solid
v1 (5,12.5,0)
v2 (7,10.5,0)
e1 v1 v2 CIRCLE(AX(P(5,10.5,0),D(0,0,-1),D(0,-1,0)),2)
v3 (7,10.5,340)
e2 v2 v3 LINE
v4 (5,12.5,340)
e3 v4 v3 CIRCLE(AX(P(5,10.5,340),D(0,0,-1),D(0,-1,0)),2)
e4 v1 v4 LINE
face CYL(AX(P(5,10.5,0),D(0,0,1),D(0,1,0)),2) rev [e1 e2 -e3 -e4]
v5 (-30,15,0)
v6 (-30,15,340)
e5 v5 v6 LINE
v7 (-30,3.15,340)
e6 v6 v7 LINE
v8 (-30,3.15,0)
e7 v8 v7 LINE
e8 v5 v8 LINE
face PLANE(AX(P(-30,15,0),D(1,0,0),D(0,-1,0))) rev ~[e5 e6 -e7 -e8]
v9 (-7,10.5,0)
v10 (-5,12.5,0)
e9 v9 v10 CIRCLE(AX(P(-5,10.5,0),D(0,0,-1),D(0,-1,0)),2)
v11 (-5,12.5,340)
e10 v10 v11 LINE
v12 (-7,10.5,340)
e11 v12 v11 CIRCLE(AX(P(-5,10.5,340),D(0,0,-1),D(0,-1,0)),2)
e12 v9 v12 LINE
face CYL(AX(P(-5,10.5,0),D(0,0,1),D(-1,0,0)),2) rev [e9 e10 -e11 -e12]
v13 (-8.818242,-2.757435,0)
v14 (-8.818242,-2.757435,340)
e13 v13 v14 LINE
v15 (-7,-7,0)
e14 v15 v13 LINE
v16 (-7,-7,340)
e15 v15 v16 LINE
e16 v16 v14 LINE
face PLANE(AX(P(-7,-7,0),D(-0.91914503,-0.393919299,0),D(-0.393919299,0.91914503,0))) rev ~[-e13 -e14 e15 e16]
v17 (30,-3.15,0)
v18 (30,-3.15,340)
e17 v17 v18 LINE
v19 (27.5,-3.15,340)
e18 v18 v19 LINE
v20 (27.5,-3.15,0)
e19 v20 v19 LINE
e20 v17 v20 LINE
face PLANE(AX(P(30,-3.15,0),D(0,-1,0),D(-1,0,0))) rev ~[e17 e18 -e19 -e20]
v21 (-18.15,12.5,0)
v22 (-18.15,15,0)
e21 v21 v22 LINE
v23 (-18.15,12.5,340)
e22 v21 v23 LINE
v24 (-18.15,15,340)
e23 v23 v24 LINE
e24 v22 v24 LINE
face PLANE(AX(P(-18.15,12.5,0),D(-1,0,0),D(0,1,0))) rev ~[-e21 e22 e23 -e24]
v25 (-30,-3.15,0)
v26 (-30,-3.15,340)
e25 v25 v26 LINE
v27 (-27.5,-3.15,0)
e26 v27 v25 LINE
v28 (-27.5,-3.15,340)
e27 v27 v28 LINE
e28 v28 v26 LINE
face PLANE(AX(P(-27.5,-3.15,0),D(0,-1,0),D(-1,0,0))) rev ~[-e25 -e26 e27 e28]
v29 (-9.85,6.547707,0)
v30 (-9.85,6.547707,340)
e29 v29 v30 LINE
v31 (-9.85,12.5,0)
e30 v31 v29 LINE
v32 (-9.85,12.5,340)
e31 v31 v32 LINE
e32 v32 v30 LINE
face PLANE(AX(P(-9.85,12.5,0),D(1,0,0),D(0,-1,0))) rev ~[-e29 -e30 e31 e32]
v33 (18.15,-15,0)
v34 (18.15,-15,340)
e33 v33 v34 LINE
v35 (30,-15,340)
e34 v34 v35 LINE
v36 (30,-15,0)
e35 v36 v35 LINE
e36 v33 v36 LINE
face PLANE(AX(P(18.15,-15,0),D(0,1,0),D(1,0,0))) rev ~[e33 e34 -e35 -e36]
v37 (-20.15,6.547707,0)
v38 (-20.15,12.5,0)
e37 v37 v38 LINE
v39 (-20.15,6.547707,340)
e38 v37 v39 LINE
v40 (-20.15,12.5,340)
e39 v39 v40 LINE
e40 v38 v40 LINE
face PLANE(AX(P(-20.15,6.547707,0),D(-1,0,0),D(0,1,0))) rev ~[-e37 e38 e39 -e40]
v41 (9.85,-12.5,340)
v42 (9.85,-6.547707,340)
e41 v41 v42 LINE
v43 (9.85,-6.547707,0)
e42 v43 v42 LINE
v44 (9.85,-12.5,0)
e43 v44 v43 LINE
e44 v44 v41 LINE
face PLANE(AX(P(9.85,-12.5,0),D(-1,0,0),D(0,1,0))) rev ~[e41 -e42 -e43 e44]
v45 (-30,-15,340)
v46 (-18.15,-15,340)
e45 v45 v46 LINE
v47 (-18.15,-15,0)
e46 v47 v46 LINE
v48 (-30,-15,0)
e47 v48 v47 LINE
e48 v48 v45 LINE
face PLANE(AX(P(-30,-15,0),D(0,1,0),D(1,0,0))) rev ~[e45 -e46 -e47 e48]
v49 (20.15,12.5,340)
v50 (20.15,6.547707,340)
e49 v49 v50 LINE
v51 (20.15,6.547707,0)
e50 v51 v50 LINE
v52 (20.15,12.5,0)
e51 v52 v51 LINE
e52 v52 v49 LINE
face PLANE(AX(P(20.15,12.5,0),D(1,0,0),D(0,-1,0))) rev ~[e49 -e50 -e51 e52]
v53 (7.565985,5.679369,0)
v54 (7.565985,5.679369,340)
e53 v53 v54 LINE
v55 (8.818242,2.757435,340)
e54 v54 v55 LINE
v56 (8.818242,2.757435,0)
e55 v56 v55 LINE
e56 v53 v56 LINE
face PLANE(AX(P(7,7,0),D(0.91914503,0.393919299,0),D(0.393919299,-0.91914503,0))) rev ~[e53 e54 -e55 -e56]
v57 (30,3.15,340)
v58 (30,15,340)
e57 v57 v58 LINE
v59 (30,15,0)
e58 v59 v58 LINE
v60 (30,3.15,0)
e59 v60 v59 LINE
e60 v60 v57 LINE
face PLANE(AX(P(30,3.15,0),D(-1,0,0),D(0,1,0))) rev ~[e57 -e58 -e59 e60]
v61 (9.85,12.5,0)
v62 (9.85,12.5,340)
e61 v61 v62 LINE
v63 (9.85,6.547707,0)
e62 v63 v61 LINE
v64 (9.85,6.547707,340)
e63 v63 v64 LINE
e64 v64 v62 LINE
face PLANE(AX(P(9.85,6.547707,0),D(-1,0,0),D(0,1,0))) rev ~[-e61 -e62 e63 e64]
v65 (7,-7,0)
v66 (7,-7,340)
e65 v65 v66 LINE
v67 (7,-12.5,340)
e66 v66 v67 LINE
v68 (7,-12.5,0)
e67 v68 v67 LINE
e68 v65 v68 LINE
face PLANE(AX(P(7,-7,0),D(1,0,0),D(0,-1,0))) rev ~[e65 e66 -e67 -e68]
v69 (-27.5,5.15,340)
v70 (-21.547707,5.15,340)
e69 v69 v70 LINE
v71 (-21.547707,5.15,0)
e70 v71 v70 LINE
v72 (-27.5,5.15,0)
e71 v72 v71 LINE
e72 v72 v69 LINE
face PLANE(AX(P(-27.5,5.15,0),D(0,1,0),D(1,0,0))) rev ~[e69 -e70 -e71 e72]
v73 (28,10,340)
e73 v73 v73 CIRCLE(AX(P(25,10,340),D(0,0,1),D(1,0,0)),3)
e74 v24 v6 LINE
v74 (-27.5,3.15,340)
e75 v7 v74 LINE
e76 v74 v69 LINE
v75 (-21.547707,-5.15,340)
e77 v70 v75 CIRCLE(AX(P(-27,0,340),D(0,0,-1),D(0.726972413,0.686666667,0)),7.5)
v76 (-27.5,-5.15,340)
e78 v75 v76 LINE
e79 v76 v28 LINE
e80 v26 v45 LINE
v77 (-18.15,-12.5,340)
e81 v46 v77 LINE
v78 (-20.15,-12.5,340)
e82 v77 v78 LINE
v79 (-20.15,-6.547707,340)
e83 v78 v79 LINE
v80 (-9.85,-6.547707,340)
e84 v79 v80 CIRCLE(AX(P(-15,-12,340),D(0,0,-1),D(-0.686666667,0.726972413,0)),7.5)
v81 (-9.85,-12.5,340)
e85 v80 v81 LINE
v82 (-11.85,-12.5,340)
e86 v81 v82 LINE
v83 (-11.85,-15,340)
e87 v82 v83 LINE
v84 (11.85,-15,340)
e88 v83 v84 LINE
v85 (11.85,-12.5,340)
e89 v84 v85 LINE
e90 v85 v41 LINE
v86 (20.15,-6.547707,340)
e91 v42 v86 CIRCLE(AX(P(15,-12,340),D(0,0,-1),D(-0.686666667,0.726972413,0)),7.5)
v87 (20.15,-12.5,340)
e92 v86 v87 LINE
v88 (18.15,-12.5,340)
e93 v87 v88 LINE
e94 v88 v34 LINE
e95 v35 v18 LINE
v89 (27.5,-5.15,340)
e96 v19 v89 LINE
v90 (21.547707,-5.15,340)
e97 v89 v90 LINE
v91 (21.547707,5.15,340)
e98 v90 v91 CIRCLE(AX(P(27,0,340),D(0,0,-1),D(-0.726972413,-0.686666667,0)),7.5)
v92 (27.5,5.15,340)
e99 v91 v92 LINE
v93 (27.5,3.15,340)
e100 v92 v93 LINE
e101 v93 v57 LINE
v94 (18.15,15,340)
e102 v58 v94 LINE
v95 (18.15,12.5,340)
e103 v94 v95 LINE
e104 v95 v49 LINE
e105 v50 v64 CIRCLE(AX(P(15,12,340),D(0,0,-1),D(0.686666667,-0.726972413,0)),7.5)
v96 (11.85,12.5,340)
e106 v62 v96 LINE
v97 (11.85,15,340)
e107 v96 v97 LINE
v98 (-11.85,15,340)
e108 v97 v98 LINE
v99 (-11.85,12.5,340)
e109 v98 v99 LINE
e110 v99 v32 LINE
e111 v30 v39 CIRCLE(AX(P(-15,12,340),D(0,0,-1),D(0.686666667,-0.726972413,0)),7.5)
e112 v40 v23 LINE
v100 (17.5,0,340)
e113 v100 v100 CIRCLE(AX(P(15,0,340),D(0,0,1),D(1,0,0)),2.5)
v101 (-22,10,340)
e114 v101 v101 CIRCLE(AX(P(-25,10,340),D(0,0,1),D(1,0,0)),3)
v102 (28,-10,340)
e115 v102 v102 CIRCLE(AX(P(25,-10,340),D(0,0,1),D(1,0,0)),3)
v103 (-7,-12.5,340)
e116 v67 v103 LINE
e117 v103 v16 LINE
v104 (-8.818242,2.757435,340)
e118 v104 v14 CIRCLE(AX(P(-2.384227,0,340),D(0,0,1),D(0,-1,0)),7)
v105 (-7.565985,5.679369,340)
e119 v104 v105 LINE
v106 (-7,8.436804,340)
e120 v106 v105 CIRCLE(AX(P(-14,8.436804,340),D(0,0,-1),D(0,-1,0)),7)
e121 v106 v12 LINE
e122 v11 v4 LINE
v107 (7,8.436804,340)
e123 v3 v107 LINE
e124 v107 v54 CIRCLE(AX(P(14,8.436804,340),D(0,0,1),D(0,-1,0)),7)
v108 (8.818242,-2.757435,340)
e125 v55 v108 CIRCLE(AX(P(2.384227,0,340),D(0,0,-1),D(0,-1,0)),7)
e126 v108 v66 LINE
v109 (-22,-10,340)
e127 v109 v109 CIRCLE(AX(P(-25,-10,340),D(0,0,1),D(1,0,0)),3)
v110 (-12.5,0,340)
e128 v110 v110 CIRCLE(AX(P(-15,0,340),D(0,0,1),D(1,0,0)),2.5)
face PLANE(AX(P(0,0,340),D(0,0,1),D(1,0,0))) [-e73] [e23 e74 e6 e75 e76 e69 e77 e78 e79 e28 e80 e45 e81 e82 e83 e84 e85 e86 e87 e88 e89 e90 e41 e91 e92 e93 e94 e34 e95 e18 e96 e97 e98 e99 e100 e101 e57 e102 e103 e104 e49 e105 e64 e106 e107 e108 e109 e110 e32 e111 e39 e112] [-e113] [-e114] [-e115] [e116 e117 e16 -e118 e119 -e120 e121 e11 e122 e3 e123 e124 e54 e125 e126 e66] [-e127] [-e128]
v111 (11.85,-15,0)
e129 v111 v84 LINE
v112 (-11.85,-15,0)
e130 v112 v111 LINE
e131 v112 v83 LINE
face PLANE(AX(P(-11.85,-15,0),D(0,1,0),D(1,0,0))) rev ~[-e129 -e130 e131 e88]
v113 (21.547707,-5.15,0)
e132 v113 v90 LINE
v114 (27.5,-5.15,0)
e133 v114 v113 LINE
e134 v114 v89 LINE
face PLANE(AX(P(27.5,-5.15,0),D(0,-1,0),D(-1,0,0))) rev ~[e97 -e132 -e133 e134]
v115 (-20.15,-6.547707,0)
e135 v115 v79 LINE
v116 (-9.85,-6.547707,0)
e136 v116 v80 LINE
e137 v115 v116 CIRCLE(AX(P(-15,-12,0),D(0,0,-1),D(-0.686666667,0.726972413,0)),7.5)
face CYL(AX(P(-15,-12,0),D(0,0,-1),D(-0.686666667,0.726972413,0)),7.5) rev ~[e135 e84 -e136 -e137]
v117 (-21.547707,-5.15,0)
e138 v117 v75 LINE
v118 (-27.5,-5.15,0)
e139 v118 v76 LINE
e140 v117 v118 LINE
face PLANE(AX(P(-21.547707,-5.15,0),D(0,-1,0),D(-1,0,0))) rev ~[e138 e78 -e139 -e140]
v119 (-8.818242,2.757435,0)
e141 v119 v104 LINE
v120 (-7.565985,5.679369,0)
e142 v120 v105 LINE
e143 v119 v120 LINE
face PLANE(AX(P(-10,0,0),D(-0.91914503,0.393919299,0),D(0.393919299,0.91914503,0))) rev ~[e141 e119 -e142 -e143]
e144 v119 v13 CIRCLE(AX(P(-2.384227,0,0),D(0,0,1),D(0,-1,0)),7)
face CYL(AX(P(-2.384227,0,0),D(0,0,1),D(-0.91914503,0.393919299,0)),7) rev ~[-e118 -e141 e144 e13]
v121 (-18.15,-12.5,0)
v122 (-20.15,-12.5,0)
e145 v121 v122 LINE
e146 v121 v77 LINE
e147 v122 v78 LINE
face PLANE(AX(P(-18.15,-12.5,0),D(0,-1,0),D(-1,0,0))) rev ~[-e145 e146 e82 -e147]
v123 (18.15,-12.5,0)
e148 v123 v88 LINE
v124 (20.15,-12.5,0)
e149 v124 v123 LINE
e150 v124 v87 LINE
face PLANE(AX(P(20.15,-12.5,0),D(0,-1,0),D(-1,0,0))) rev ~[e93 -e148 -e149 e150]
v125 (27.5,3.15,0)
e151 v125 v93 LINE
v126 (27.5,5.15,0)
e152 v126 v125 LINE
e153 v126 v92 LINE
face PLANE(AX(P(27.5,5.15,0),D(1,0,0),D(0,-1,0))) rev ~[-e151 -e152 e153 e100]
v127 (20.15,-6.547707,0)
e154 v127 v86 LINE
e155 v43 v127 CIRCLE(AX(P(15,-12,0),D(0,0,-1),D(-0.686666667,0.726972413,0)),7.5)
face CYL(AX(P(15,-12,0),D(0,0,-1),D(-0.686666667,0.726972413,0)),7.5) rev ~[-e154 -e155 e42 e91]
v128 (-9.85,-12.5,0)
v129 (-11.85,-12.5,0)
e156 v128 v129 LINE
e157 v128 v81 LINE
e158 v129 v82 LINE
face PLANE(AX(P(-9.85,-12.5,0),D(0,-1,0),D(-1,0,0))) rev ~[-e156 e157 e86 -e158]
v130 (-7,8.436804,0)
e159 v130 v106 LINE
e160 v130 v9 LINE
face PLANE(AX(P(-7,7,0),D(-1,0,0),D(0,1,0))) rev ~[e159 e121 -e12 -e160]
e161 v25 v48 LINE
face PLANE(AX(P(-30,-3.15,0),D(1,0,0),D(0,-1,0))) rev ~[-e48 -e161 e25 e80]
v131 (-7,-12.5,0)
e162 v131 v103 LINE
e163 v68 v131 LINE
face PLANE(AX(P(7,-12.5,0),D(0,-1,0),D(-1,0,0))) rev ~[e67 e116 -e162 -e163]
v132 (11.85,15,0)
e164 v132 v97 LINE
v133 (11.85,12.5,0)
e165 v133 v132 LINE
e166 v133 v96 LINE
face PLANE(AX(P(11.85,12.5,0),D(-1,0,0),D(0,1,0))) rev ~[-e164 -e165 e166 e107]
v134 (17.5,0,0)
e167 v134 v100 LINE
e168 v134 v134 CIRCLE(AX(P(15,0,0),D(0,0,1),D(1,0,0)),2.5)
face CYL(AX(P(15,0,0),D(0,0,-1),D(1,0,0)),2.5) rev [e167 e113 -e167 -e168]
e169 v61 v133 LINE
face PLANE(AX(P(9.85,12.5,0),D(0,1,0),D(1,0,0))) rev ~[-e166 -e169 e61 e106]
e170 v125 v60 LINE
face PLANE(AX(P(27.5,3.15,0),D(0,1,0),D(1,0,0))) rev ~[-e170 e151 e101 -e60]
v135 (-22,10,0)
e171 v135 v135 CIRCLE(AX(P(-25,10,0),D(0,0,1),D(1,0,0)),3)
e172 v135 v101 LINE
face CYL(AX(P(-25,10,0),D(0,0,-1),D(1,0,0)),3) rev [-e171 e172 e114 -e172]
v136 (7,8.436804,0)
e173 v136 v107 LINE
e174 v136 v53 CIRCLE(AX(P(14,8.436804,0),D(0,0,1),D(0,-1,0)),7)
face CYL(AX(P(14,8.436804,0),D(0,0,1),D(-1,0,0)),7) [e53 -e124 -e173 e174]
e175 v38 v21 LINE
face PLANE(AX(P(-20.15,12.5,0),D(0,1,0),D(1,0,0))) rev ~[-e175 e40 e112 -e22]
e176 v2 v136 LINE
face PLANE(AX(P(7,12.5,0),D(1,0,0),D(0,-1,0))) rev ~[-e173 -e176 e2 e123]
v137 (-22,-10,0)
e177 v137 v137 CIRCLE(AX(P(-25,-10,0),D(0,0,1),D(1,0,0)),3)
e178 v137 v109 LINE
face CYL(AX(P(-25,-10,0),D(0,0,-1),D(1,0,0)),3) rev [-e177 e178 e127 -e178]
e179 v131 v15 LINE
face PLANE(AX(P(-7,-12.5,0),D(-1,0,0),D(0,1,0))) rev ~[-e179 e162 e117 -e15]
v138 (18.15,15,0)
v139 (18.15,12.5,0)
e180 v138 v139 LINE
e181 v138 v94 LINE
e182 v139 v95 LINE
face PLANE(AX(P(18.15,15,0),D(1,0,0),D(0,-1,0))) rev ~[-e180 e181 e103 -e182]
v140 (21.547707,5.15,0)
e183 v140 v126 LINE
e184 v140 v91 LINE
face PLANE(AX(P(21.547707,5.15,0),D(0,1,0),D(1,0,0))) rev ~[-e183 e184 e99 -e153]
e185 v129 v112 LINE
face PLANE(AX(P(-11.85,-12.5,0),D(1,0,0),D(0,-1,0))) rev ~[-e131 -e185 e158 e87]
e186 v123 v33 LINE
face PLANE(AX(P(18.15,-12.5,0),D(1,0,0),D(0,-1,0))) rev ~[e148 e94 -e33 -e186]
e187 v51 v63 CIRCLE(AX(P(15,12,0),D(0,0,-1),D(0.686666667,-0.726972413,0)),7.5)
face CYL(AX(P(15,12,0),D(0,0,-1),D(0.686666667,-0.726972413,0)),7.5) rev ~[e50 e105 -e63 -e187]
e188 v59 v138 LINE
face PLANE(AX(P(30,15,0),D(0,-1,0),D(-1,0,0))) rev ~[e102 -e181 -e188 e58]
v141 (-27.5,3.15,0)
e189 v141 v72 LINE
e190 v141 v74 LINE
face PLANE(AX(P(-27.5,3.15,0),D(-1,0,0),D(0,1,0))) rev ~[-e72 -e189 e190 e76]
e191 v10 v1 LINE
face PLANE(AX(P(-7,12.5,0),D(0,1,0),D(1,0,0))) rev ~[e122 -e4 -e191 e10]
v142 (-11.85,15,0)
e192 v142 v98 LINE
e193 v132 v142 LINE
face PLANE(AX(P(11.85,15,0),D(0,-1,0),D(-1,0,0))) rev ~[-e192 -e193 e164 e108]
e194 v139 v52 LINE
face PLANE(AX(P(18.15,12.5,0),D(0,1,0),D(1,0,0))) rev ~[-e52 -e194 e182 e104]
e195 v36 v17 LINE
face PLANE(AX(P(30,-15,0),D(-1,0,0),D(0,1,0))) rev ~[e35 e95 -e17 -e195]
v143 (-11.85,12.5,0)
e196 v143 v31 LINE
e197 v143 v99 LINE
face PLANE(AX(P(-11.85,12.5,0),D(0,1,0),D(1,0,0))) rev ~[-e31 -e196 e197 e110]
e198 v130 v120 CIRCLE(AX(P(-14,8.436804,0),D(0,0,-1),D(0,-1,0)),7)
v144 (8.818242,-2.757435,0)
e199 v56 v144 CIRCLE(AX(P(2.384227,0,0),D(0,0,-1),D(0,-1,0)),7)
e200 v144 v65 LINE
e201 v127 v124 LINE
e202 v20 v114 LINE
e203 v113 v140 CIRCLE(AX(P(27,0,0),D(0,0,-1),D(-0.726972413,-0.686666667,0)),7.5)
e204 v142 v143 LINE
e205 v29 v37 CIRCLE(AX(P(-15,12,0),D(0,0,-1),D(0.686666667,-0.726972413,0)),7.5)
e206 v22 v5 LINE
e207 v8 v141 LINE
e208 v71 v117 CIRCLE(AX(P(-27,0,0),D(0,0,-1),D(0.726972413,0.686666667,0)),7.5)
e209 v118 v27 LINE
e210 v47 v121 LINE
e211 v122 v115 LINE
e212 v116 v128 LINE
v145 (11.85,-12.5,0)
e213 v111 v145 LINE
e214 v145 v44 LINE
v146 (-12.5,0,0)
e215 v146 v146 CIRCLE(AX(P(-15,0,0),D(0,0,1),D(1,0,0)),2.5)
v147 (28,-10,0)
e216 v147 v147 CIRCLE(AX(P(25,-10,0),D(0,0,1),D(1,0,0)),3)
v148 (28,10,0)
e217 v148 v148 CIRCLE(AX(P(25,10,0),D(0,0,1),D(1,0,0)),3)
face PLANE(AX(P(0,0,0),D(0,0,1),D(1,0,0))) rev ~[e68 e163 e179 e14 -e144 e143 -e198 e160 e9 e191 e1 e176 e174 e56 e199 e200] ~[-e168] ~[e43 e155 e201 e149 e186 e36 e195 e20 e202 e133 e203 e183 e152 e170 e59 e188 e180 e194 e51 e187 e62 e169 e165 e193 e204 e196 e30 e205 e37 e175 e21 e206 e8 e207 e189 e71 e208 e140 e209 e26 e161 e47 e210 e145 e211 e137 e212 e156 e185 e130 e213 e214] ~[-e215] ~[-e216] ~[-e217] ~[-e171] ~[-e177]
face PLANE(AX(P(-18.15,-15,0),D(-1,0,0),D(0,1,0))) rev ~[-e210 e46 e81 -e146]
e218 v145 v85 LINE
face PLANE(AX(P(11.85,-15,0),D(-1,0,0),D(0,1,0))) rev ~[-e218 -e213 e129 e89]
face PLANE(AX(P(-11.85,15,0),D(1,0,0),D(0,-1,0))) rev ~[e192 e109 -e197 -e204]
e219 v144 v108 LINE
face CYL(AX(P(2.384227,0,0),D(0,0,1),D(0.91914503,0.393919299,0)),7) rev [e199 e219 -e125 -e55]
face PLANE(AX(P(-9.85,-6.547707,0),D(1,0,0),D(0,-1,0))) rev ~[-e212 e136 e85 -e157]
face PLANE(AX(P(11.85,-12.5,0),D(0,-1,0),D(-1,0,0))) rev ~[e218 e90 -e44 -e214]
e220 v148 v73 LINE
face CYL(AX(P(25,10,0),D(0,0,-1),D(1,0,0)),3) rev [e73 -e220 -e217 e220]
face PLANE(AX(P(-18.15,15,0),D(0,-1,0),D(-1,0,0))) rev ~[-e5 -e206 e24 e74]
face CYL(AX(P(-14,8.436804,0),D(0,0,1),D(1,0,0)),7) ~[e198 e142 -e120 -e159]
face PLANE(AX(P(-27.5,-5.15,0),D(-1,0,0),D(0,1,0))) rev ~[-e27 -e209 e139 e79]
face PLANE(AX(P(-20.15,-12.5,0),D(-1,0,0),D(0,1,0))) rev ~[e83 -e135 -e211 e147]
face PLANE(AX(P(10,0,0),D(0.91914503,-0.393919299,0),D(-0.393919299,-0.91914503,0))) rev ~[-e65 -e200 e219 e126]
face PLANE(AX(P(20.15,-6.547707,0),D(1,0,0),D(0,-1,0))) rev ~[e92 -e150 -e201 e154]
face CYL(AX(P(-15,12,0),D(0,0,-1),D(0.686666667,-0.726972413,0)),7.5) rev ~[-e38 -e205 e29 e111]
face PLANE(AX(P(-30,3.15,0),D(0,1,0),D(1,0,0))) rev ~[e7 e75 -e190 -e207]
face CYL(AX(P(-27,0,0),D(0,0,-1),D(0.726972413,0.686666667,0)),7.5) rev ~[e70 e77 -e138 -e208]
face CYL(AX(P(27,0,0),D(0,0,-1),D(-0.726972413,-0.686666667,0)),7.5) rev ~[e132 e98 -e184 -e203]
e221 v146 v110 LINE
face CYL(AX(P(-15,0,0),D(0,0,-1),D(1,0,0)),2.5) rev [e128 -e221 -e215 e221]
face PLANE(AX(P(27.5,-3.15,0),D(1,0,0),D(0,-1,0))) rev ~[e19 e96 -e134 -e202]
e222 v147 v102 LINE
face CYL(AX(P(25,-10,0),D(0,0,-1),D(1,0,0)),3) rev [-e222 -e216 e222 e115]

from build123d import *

# Parameters (mm, degrees)
F0_R     = 3
F0_R_2   = 2.5
F1_DEPTH = 340
F2_R     = 2
F3_R     = 7


# Not quite as in the source:
# - a feature names something its author has since deleted; it is built from what else it names


with BuildPart() as f1:
    # F0 (on Top) → F1 (new body)
    with BuildSketch(Plane.XY):
        with BuildLine():
            Line((18.15, -15), (30, -15))
            Line((30, -15), (30, -3.15))
            Line((30, -3.15), (27.5, -3.15))
            Line((27.5, -3.15), (27.5, -5.15))
            Line((27.5, -5.15), (21.5477069044, -5.15))
            ThreePointArc((21.5477069044, -5.15), (19.5, 0), (21.5477069044, 5.15))
            Line((21.5477069044, 5.15), (27.5, 5.15))
            Line((27.5, 5.15), (27.5, 3.15))
            Line((27.5, 3.15), (30, 3.15))
            Line((30, 3.15), (30, 15))
            Line((30, 15), (18.15, 15))
            Line((18.15, 15), (18.15, 12.5))
            Line((18.15, 12.5), (20.15, 12.5))
            Line((20.15, 12.5), (20.15, 6.5477069044))
            ThreePointArc((20.15, 6.5477069044), (15, 4.5), (9.85, 6.5477069044))
            Line((9.85, 6.5477069044), (9.85, 12.5))
            Line((9.85, 12.5), (11.85, 12.5))
            Line((11.85, 12.5), (11.85, 15))
            Line((11.85, 15), (-11.85, 15))
            Line((-11.85, 15), (-11.85, 12.5))
            Line((-11.85, 12.5), (-9.85, 12.5))
            Line((-9.85, 12.5), (-9.85, 6.5477069044))
            ThreePointArc((-9.85, 6.5477069044), (-15, 4.5), (-20.15, 6.5477069044))
            Line((-20.15, 6.5477069044), (-20.15, 12.5))
            Line((-20.15, 12.5), (-18.15, 12.5))
            Line((-18.15, 12.5), (-18.15, 15))
            Line((-18.15, 15), (-30, 15))
            Line((-30, 15), (-30, 3.15))
            Line((-30, 3.15), (-27.5, 3.15))
            Line((-27.5, 3.15), (-27.5, 5.15))
            Line((-27.5, 5.15), (-21.5477069044, 5.15))
            ThreePointArc((-21.5477069044, 5.15), (-19.5, 0), (-21.5477069044, -5.15))
            Line((-21.5477069044, -5.15), (-27.5, -5.15))
            Line((-27.5, -5.15), (-27.5, -3.15))
            Line((-27.5, -3.15), (-30, -3.15))
            Line((-30, -3.15), (-30, -15))
            Line((-30, -15), (-18.15, -15))
            Line((-18.15, -15), (-18.15, -12.5))
            Line((-18.15, -12.5), (-20.15, -12.5))
            Line((-20.15, -12.5), (-20.15, -6.5477069044))
            ThreePointArc((-20.15, -6.5477069044), (-15, -4.5), (-9.85, -6.5477069044))
            Line((-9.85, -6.5477069044), (-9.85, -12.5))
            Line((-9.85, -12.5), (-11.85, -12.5))
            Line((-11.85, -12.5), (-11.85, -15))
            Line((-11.85, -15), (11.85, -15))
            Line((11.85, -15), (11.85, -12.5))
            Line((11.85, -12.5), (9.85, -12.5))
            Line((9.85, -12.5), (9.85, -6.5477069044))
            ThreePointArc((9.85, -6.5477069044), (15, -4.5), (20.15, -6.5477069044))
            Line((20.15, -6.5477069044), (20.15, -12.5))
            Line((20.15, -12.5), (18.15, -12.5))
            Line((18.15, -12.5), (18.15, -15))
        make_face()
        with Locations((-25, -10)):
            Circle(F0_R, mode=Mode.SUBTRACT)
        with Locations((25, -10)):
            Circle(F0_R, mode=Mode.SUBTRACT)
        with Locations((-15, 0)):
            Circle(F0_R_2, mode=Mode.SUBTRACT)
        with Locations((-25, 10)):
            Circle(F0_R, mode=Mode.SUBTRACT)
        Polygon((-7, 7), (-7, 12.5), (0, 12.5), (7, 12.5), (7, 7), (10, 0), (7, -7), (7, -12.5), (0, -12.5), (-7, -12.5), (-7, -7), (-10, 0), align=None, mode=Mode.SUBTRACT)
        with Locations((15, 0)):
            Circle(F0_R_2, mode=Mode.SUBTRACT)
        with Locations((25, 10)):
            Circle(F0_R, mode=Mode.SUBTRACT)
    extrude(amount=F1_DEPTH)

    # F2
    f2_edges = [f1.edges().sort_by_distance(p)[0] for p in [
        (-7, 12.5, 170),
        (7, 12.5, 170),
    ]]
    fillet(f2_edges, radius=F2_R)

    # F3
    f3_edges = [f1.edges().sort_by_distance(p)[0] for p in [
        (-7, 7, 170),
        (-10, 0, 170),
        (7, 7, 170),
        (10, 0, 170),
    ]]
    fillet(f3_edges, radius=F3_R)


solid = f1.part
